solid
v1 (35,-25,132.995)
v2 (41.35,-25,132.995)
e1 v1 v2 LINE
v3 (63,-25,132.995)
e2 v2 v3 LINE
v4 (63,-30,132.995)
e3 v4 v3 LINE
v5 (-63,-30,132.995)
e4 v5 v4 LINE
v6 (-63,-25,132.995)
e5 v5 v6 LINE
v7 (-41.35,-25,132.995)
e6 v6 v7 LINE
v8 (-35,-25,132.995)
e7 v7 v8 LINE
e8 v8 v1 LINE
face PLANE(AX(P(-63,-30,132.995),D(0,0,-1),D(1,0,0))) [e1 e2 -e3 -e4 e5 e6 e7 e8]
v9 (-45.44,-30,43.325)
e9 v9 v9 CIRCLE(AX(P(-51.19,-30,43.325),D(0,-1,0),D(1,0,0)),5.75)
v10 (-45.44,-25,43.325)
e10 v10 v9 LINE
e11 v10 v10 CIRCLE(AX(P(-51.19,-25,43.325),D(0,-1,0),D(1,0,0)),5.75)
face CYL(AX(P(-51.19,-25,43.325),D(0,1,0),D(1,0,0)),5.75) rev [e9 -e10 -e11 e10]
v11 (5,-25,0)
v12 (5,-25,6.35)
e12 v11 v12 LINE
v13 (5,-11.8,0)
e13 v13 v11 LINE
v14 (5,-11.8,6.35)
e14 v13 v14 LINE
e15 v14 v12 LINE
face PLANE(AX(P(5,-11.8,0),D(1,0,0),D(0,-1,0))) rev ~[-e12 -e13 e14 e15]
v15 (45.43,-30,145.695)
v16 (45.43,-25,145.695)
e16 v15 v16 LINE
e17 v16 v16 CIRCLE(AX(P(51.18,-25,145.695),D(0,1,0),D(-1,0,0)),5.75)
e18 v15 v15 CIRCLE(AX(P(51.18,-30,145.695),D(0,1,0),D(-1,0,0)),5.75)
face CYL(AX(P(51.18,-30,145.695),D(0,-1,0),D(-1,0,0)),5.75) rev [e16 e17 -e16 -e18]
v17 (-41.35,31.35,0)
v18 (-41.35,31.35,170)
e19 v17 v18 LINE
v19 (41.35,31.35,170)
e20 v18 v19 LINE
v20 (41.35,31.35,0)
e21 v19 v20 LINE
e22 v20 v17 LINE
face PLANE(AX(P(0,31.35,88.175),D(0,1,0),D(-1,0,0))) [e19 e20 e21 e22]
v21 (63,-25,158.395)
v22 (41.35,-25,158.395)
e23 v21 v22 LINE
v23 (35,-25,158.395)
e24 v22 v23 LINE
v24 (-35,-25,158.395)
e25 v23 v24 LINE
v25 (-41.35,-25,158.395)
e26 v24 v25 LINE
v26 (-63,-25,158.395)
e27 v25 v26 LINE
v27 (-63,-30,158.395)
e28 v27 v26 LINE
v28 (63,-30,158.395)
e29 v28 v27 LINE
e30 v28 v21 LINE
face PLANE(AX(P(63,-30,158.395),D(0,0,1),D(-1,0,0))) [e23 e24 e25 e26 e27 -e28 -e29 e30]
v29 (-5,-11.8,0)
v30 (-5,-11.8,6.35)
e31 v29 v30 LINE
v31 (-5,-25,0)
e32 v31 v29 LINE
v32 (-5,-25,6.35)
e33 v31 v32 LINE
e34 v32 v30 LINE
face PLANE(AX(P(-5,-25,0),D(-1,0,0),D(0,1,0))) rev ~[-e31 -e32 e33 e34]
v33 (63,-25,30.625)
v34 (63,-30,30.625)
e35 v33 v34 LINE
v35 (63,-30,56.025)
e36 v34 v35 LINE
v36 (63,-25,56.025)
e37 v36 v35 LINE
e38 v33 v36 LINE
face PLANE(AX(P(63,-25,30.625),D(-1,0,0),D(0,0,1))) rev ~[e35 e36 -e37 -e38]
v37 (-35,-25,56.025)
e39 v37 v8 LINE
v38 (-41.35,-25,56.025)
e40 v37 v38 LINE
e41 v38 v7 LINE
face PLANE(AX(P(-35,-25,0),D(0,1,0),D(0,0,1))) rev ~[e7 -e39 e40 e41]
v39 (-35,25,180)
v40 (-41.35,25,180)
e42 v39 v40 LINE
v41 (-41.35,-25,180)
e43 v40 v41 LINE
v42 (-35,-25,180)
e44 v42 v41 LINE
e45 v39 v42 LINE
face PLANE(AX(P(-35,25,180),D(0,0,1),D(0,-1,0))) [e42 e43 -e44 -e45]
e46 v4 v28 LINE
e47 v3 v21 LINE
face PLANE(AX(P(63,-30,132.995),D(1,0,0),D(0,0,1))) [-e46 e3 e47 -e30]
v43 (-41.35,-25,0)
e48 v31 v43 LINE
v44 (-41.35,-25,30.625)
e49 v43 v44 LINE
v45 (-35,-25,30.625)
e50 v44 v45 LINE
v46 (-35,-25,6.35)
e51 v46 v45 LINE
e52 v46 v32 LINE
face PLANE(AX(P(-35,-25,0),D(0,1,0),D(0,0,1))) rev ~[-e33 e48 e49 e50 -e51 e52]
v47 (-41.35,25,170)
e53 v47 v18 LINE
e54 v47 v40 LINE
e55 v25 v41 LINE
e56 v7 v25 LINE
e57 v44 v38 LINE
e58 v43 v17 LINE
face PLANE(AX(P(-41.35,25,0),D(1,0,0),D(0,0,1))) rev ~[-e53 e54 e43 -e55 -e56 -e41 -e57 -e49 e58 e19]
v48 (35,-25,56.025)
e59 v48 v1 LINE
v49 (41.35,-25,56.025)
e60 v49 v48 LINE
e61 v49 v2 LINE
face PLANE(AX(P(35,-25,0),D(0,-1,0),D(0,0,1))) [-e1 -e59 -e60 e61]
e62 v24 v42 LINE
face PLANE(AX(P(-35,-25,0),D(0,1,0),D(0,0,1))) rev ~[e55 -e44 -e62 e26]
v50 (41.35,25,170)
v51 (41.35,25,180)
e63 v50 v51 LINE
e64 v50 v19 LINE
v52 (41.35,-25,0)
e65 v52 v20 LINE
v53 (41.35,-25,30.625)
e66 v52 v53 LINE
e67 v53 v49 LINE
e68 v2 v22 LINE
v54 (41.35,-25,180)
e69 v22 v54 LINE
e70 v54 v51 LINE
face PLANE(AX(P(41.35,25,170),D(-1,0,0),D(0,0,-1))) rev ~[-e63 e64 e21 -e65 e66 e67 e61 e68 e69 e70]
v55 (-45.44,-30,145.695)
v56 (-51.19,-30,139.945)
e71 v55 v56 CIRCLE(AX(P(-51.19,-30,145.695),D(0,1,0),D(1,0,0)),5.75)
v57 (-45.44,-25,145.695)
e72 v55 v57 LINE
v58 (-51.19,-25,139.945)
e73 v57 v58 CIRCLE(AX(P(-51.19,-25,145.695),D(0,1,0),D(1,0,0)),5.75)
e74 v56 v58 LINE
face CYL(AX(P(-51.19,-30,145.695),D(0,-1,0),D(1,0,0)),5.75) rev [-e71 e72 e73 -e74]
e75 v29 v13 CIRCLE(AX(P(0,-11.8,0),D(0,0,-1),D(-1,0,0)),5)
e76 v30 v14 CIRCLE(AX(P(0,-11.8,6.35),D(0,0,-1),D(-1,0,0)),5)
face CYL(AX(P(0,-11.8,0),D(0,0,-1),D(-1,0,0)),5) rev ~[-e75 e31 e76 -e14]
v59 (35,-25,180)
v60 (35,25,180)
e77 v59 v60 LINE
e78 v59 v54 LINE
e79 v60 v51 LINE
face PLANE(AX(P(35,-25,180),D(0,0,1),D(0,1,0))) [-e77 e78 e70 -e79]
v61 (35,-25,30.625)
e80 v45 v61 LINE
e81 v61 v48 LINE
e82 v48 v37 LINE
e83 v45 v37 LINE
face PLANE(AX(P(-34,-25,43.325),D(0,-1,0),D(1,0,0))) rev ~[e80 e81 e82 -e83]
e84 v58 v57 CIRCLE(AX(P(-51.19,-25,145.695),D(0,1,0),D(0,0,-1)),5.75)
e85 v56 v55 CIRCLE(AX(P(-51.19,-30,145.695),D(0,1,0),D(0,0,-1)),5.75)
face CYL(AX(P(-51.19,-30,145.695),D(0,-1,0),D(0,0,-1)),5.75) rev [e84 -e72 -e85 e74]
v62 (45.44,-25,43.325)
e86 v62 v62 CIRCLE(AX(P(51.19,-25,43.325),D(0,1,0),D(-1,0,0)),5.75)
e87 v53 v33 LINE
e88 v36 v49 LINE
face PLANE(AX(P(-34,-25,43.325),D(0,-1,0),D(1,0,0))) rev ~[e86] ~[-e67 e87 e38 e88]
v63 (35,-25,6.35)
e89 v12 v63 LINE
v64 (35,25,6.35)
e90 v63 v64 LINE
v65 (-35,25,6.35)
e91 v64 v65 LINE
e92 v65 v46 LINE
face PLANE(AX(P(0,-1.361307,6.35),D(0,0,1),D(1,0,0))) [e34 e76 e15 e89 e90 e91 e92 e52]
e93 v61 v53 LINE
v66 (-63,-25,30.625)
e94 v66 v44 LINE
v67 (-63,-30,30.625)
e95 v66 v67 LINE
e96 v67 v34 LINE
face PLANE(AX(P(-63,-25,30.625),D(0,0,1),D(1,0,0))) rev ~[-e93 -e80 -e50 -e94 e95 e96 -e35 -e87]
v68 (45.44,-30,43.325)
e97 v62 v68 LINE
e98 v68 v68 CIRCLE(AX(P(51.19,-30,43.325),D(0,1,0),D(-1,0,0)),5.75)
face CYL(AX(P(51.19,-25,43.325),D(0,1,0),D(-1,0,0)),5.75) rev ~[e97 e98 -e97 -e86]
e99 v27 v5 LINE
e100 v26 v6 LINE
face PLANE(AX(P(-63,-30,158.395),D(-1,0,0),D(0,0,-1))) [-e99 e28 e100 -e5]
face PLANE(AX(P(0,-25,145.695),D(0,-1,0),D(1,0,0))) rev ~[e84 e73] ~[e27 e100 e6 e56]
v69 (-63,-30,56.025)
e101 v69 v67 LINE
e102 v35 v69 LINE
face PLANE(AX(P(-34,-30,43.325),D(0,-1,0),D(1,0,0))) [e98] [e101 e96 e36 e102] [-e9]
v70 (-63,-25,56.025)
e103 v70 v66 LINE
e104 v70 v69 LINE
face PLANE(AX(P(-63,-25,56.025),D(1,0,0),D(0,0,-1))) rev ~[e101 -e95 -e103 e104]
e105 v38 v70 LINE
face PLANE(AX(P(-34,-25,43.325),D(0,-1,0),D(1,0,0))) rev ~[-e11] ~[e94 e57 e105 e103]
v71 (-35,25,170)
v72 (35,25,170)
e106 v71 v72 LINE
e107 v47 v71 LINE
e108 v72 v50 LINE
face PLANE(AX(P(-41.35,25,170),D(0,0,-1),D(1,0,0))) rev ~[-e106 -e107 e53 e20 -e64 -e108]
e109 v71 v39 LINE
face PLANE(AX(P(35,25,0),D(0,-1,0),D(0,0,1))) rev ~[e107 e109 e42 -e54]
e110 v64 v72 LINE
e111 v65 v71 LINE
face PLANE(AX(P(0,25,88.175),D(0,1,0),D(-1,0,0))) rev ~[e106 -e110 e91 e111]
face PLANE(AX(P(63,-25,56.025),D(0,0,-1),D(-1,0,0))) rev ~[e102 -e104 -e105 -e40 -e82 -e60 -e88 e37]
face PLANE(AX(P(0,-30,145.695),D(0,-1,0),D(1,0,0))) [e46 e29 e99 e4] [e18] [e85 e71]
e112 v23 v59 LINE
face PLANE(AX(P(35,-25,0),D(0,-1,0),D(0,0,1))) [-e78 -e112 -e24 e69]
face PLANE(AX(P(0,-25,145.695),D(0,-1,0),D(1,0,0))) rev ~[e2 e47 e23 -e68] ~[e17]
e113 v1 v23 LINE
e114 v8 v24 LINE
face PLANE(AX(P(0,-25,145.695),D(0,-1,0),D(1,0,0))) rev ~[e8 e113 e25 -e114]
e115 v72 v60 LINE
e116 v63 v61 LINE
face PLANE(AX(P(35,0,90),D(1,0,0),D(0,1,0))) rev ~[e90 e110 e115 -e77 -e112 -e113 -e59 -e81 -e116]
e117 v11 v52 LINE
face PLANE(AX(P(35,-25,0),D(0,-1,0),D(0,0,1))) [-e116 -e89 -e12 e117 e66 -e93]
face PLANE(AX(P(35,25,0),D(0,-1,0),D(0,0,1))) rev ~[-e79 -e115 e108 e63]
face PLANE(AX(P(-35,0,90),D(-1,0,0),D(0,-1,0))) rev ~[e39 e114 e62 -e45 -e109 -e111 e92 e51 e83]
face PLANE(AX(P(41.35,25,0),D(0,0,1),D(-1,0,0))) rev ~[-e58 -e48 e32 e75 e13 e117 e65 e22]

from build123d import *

# Parameters (mm, degrees)
F1_DEPTH  = 6.35
F2_W      = 50
F2_H      = 180
F3_DEPTH  = 6.35
F4_W      = 50
F4_H      = 180
F5_DEPTH  = 6.35
F6_W      = 70
F6_H      = 163.65
F7_DEPTH  = 6.35
F8_R      = 5.75
F8_W      = 6.35
F8_H      = 12.7
F8_W_2    = 30
F9_DEPTH  = 5
F11_DEPTH = 5


# Not quite as in the source:
# - a feature names something its author has since deleted; it is built from what else it names


with BuildPart() as f1:
    # F0 (on Top) → F1 (new body)
    with BuildSketch(Plane.XY):
        with BuildLine():
            Line((35, -25), (35, 25))
            Line((35, 25), (-35, 25))
            Line((-35, 25), (-35, -25))
            Line((-35, -25), (-5, -25))
            Line((-5, -25), (-5, -11.8))
            ThreePointArc((-5, -11.8), (0, -6.8), (5, -11.8))
            Line((5, -11.8), (5, -25))
            Line((5, -25), (35, -25))
        make_face()
    extrude(amount=F1_DEPTH)

    # F2 (on face) → F3 (join)
    with BuildSketch(Plane(origin=(-35, 0, 0), x_dir=(0, -1, 0), z_dir=(-1, 0, 0))):
        with Locations((0, 90)):
            Rectangle(F2_W, F2_H)
    extrude(amount=F3_DEPTH)

    # F4 (on face) → F5 (join)
    with BuildSketch(Plane.YZ.offset(35)):
        with Locations((0, 90)):
            Rectangle(F4_W, F4_H)
    extrude(amount=F5_DEPTH)

    # F6 (on face) → F7 (join)
    with BuildSketch(Plane(origin=(0, 25, 0), x_dir=(-1, 0, 0), z_dir=(0, 1, 0))):
        with Locations((0, 88.175)):
            Rectangle(F6_W, F6_H)
        Polygon((-41.35, 0), (41.35, 0), (41.35, 170), (35, 170), (35, 6.35), (-35, 6.35), (-35, 170), (-41.35, 170), align=None)
    extrude(amount=F7_DEPTH)

    # F8 (on face) → F9 (join)
    with BuildSketch(Plane.XZ.offset(25)):
        Polygon((-63, 30.625), (-5, 30.625), (-5, 43.325), (-5, 56.025), (-63, 56.025), align=None)
        with Locations((-51.19, 43.325)):
            Circle(F8_R, mode=Mode.SUBTRACT)
        Polygon((-5, 30.625), (5, 30.625), (5, 43.325), (5, 56.025), (-5, 56.025), (-5, 43.325), align=None)
        Polygon((41.35, 43.325), (41.35, 30.625), (63, 30.625), (63, 56.025), (41.35, 56.025), align=None)
        with BuildLine():
            ThreePointArc((56.94, 43.325), (51.19, 37.575), (45.44, 43.325))
            ThreePointArc((45.44, 43.325), (51.19, 49.075), (56.94, 43.325))
        make_face(mode=Mode.SUBTRACT)
        with Locations((38.175, 49.675)):
            Rectangle(F8_W, F8_H)
        with Locations((38.175, 36.975)):
            Rectangle(F8_W, F8_H)
        with Locations((20, 36.975)):
            Rectangle(F8_W_2, F8_H)
        with Locations((20, 49.675)):
            Rectangle(F8_W_2, F8_H)
    extrude(amount=F9_DEPTH)

    # F10 (on face) → F11 (join)
    with BuildSketch(Plane.XZ.offset(30)):
        Polygon((-63, 132.995), (-51.19, 132.995), (63, 132.995), (63, 158.395), (-63, 158.395), align=None)
        with BuildLine():
            ThreePointArc((-45.44, 145.695), (-47.1241360082, 141.6291360082), (-51.19, 139.945))
            ThreePointArc((-51.19, 139.945), (-55.2558639918, 149.7608639918), (-45.44, 145.695))
        make_face(mode=Mode.SUBTRACT)
        with BuildLine():
            ThreePointArc((56.93, 145.695), (51.18, 139.945), (45.43, 145.695))
            ThreePointArc((45.43, 145.695), (51.18, 151.445), (56.93, 145.695))
        make_face(mode=Mode.SUBTRACT)
    extrude(amount=-F11_DEPTH)


solid = f1.part
